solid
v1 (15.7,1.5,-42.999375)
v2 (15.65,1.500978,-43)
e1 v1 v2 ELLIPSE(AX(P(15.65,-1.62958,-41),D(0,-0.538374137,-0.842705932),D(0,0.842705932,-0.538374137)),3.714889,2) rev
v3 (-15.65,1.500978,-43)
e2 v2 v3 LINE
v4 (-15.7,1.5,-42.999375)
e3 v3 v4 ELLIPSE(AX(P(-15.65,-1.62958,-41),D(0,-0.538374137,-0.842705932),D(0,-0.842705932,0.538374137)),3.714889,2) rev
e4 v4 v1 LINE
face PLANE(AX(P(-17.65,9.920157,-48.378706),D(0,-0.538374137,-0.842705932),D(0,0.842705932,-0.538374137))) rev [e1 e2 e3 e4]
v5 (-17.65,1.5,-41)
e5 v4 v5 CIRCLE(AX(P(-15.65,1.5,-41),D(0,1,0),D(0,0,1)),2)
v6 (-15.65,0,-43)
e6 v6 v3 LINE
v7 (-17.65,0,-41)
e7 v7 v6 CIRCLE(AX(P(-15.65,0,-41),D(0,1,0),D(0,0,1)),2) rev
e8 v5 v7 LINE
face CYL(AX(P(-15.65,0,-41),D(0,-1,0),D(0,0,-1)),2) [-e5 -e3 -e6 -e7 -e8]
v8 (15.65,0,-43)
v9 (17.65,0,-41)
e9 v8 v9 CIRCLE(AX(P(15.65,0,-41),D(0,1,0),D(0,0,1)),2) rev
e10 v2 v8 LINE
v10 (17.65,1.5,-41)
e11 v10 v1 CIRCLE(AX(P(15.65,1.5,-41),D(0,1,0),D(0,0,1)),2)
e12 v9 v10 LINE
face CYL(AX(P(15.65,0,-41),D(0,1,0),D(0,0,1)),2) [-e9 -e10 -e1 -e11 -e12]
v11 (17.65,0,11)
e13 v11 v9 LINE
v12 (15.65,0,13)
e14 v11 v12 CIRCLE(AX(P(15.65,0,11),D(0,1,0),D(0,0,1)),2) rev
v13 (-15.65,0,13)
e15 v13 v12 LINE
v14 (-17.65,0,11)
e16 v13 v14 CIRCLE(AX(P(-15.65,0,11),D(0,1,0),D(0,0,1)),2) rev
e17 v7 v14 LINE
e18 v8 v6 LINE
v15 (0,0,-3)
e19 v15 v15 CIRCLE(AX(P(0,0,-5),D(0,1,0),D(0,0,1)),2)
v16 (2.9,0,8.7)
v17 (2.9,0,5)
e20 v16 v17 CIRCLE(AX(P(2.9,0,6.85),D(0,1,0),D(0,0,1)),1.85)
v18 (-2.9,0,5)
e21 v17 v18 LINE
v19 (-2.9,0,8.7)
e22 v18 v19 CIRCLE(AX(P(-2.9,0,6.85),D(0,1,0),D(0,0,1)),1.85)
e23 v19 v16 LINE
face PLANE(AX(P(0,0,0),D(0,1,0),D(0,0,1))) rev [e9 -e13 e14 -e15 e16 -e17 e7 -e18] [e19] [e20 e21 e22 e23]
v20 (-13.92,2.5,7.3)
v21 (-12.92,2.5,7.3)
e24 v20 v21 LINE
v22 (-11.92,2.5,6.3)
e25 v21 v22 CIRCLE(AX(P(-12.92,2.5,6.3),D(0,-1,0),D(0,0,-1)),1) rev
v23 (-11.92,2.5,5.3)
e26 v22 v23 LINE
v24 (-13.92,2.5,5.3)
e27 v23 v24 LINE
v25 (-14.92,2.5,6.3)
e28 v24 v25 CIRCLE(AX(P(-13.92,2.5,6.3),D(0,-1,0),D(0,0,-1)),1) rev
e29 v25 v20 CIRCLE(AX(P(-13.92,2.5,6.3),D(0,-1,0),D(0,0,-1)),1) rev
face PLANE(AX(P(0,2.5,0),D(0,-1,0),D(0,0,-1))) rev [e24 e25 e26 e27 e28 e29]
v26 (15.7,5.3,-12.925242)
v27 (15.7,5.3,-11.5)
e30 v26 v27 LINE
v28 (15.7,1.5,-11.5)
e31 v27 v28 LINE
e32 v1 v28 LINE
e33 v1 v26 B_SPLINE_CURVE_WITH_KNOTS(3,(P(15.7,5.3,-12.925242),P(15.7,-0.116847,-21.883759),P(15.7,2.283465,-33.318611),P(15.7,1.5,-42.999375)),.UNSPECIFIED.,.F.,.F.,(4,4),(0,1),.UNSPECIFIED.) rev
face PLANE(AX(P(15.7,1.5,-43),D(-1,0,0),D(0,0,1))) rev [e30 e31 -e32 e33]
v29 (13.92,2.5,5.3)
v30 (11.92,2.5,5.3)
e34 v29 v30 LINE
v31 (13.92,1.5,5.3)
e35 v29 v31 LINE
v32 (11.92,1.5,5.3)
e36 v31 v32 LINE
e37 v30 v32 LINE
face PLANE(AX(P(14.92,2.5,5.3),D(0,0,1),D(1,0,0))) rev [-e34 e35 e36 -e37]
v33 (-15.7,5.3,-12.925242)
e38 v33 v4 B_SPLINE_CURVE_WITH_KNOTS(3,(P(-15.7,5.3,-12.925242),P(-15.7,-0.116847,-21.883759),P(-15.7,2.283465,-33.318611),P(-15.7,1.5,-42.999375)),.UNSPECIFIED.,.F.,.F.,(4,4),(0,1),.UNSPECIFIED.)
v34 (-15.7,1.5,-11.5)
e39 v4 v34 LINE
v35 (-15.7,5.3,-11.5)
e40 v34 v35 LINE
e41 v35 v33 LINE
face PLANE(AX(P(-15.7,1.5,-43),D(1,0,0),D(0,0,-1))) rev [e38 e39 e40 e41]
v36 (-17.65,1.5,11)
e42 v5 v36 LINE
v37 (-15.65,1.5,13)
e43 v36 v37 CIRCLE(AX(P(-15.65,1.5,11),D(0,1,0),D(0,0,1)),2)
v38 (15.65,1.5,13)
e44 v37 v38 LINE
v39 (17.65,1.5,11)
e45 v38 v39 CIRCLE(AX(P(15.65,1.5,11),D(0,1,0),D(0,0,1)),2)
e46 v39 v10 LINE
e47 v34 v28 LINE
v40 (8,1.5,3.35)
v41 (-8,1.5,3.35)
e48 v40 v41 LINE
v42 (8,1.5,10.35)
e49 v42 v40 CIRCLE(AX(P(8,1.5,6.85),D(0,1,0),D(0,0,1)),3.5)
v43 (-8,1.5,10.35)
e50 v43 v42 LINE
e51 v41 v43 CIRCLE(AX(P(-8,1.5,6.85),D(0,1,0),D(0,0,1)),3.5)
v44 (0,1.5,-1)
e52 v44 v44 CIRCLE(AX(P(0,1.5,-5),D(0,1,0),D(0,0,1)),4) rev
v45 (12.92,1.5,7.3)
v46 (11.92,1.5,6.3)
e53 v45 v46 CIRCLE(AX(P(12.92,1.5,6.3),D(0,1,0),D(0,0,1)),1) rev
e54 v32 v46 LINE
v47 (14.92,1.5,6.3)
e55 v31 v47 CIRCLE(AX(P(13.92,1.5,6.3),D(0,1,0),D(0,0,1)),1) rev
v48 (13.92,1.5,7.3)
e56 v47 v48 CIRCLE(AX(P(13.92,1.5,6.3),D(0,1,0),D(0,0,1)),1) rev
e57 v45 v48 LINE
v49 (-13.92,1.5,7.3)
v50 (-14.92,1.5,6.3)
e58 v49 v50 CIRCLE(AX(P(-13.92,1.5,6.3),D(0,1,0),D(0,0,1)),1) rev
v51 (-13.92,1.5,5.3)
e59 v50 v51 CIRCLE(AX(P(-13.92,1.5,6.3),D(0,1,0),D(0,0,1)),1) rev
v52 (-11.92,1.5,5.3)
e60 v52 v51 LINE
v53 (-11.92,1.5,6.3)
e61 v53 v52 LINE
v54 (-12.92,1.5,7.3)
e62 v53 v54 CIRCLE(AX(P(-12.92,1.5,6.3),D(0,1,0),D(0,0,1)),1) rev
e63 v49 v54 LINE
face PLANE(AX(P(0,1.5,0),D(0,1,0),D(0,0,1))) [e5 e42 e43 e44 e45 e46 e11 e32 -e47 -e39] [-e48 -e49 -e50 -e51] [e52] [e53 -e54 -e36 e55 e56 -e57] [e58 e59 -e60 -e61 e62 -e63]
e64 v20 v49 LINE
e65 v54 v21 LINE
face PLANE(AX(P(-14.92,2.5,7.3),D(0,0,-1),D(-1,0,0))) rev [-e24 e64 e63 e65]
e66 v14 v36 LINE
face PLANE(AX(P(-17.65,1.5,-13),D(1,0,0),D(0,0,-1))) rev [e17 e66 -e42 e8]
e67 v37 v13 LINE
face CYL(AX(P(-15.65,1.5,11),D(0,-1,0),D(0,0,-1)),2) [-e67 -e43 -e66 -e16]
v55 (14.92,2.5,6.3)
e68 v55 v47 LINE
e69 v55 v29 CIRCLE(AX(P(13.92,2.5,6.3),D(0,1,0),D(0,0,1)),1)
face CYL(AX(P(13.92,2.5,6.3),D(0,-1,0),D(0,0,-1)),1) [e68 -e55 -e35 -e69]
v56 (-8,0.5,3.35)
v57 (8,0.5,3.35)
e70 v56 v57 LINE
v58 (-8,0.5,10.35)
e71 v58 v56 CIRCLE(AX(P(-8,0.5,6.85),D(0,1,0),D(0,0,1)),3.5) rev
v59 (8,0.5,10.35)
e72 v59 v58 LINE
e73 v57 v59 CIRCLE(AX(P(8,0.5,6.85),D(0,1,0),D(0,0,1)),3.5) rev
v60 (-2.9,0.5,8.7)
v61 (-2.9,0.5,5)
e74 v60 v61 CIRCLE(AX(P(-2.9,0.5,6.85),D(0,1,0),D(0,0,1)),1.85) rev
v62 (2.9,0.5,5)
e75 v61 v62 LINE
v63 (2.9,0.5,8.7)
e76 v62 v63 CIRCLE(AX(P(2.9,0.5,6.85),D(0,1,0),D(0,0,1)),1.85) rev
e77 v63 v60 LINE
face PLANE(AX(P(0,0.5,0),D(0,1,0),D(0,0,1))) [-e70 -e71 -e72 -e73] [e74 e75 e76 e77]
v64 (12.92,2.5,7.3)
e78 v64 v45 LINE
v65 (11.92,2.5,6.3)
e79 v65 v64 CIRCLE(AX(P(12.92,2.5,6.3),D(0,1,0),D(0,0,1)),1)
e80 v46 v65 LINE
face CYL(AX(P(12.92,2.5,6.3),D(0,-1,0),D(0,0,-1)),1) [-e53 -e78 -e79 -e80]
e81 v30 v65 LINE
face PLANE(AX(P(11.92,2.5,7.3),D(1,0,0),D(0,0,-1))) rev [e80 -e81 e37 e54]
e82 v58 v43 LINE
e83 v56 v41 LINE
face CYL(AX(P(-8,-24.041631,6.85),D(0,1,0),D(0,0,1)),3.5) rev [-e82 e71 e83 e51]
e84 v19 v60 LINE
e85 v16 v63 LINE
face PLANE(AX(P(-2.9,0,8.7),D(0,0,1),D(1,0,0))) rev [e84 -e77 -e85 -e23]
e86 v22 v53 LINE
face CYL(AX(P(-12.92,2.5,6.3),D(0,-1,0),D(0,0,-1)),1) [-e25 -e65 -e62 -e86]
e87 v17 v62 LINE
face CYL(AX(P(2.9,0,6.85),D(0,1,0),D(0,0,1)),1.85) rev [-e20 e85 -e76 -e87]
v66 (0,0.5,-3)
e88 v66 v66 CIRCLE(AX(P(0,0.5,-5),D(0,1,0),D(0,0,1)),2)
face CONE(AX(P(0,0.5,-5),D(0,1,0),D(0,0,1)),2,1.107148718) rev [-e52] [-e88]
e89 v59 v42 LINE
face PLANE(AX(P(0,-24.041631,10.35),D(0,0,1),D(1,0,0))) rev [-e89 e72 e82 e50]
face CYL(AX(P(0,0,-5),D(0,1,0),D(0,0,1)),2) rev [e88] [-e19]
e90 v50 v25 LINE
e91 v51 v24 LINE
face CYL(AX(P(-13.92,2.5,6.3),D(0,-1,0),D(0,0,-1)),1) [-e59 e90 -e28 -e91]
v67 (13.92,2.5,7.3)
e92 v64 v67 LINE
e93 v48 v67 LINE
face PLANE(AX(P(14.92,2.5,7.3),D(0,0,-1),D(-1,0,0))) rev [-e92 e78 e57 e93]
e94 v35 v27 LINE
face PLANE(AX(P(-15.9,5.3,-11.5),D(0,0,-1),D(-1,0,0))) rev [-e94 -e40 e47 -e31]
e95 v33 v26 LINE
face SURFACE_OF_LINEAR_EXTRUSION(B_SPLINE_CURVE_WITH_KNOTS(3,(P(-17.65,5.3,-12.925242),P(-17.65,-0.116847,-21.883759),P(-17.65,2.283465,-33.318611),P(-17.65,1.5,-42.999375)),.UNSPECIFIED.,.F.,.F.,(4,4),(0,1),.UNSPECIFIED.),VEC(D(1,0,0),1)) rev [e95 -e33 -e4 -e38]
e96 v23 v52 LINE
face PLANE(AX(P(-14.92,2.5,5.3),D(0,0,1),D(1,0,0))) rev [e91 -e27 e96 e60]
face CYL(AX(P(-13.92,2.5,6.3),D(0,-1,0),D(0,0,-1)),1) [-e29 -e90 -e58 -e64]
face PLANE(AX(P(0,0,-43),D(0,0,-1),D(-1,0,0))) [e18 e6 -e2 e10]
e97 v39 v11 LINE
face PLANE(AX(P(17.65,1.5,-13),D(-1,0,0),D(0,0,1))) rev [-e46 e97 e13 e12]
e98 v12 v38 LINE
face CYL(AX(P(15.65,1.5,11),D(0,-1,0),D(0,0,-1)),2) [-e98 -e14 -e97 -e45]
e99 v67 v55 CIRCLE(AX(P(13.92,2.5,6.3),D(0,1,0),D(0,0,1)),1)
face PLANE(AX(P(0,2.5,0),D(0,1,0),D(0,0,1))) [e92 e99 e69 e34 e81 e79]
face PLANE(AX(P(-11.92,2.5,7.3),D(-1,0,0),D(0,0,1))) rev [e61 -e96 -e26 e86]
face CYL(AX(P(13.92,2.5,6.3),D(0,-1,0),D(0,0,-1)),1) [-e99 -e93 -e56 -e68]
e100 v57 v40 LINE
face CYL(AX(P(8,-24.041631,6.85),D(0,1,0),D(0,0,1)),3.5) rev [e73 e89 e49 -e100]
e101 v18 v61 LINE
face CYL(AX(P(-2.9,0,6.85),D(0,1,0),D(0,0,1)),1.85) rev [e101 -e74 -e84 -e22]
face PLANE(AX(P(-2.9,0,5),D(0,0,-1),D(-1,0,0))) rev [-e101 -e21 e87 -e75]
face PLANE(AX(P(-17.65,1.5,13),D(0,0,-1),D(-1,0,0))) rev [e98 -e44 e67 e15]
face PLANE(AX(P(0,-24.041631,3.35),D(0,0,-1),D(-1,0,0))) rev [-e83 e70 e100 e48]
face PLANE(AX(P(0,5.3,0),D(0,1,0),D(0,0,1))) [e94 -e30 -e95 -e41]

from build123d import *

# Parameters (mm, degrees)
SKETCH1_W               = 35.3
SKETCH1_H               = 26
BOSS_EXTRUDE1_DEPTH     = 1.5
SKETCH2_W               = 31.8
SKETCH2_H               = 1.5
BOSS_EXTRUDE2_DEPTH     = 3.8
CUT_EXTRUDE1_DEPTH      = 23.247752695
CUT_EXTRUDE1_DEPTH_BACK = 23.247752695
SKETCH3_R               = 2
CHAMFER1_SIZE           = 2
CHAMFER1_SIZE2          = 1
FILLET1_R               = 2
BOSS_EXTRUDE3_DEPTH     = 30
FILLET2_R               = 2
SKETCH6_W               = 3
SKETCH6_H               = 2
BOSS_EXTRUDE4_DEPTH     = 1
FILLET4_R               = 1
SKETCH7_W               = 1.743977538
SKETCH7_H               = 6.350659455
SKETCH7_W_2             = 2.282976844
SKETCH7_H_2             = 7.649157782
CUT_EXTRUDE2_DEPTH      = 37.494691395
CUT_EXTRUDE5_DEPTH      = 55.674605623
CUT_EXTRUDE5_DEPTH_BACK = 55.674605623
CUT_EXTRUDE6_DEPTH      = 47.63649323
CUT_EXTRUDE6_DEPTH_BACK = 47.63649323
CUT_EXTRUDE7_START      = -1.5
CUT_EXTRUDE7_DEPTH      = 1


with BuildPart() as part:
    # Sketch1 → Boss-Extrude1 (new body)
    with BuildSketch(Plane(origin=(0, 0, 0), x_dir=(1, 0, 0), z_dir=(0, 1, 0))):
        Rectangle(SKETCH1_W, SKETCH1_H)
    extrude(amount=BOSS_EXTRUDE1_DEPTH)

    # Sketch2 → Boss-Extrude2 (add)
    with BuildSketch(Plane(origin=(0, 1.5, 0), x_dir=(1, 0, 0), z_dir=(0, 1, 0))):
        with Locations((0, 12.25)):
            Rectangle(SKETCH2_W, SKETCH2_H)
    extrude(amount=BOSS_EXTRUDE2_DEPTH)

    # Sketch3 → Cut-Extrude1 (cut, two sides: drawn at the far end of the back side and taken through both)
    with BuildSketch(Plane(origin=(0, 1.5, 0), x_dir=(1, 0, 0), z_dir=(0, 1, 0)).offset(-CUT_EXTRUDE1_DEPTH_BACK)):
        with Locations(Location((0, 5, 0), (0, 0, 270))):
            Circle(SKETCH3_R)
    extrude(amount=CUT_EXTRUDE1_DEPTH + CUT_EXTRUDE1_DEPTH_BACK, mode=Mode.SUBTRACT)

    # Chamfer1
    chamfer1_edges = [part.edges().sort_by_distance(p)[0] for p in [
        (0, 1.5, -7),
    ]]
    chamfer1_side = [part.faces().sort_by_distance(p)[0] for p in [
        (0, 1.5, 0.754672273),
    ]]
    chamfer(chamfer1_edges, length=CHAMFER1_SIZE, length2=CHAMFER1_SIZE2, reference=chamfer1_side[0])

    # Fillet1
    fillet1_edges = [part.edges().sort_by_distance(p)[0] for p in [
        (17.65, 0.75, 13),
        (-17.65, 0.75, 13),
    ]]
    fillet(fillet1_edges, radius=FILLET1_R)

    # Sketch4 → Boss-Extrude3 (add)
    with BuildSketch(Plane(origin=(0, 0, -13), x_dir=(-1, 0, 0), z_dir=(0, 0, -1))):
        Polygon((-15.9, 5.3), (-15.9, 1.5), (-17.65, 1.5), (-17.65, 0), (17.65, 0), (17.65, 1.5), (15.9, 1.5), (15.9, 5.3), align=None)
    extrude(amount=BOSS_EXTRUDE3_DEPTH)

    # Fillet2
    fillet2_edges = [part.edges().sort_by_distance(p)[0] for p in [
        (-17.65, 0.75, -43),
        (17.65, 0.75, -43),
    ]]
    fillet(fillet2_edges, radius=FILLET2_R)

    # Sketch6 → Boss-Extrude4 (add)
    with BuildSketch(Plane(origin=(0, 1.5, 0), x_dir=(1, 0, 0), z_dir=(0, 1, 0))):
        with Locations((-13.42, -6.3)):
            Rectangle(SKETCH6_W, SKETCH6_H)
        with Locations((13.42, -6.3)):
            Rectangle(SKETCH6_W, SKETCH6_H)
    extrude(amount=BOSS_EXTRUDE4_DEPTH)

    # Fillet4
    fillet4_edges = [part.edges().sort_by_distance(p)[0] for p in [
        (-14.92, 2, 5.3),
        (14.92, 2, 5.3),
        (14.92, 2, 7.3),
        (11.92, 2, 7.3),
        (-11.92, 2, 7.3),
        (-14.92, 2, 7.3),
    ]]
    fillet(fillet4_edges, radius=FILLET4_R - 0.0001)  # a hair under: the kernel refuses the full size

    # Sketch7 → Cut-Extrude2 (cut, through all)
    with BuildSketch(Plane.XY.offset(-11.5)):
        with Locations((-16.571988769, 4.675329728)):
            Rectangle(SKETCH7_W, SKETCH7_H)
        with Locations((16.841488422, 5.324578891)):
            Rectangle(SKETCH7_W_2, SKETCH7_H_2)
    extrude(amount=-CUT_EXTRUDE2_DEPTH, mode=Mode.SUBTRACT)

    # Sketch10 → Cut-Extrude5 (cut, two sides: drawn at the far end of the back side and taken through both)
    with BuildSketch(Plane(origin=(15.7, 0, 0), x_dir=(0, 0, -1), z_dir=(1, 0, 0)).offset(-CUT_EXTRUDE5_DEPTH_BACK)):
        with BuildLine():
            Line((12.925241615, 5.3), (13.354629123, 9.309511059))
            Line((13.354629123, 9.309511059), (48.378706372, 9.920156593))
            Line((48.378706372, 9.920156593), (42.999374902, 1.5))
            add(Edge.make_bspline(
                [(12.925241615, 5.3), (21.883759375, -0.11684658), (33.318611191, 2.283464976), (42.999374902, 1.5)],
                knots=[0, 0, 0, 0, 1, 1, 1, 1], degree=3))
        make_face()
    extrude(amount=CUT_EXTRUDE5_DEPTH + CUT_EXTRUDE5_DEPTH_BACK, mode=Mode.SUBTRACT)

    # Sketch12 → Cut-Extrude6 (cut, two sides: drawn at the far end of the back side and taken through both)
    with BuildSketch(Plane(origin=(0, 1.5, 0), x_dir=(1, 0, 0), z_dir=(0, 1, 0)).offset(-CUT_EXTRUDE6_DEPTH_BACK)):
        with BuildLine():
            Line((-2.9, -5), (2.9, -5))
            ThreePointArc((2.9, -5), (4.75, -6.85), (2.9, -8.7))
            Line((2.9, -8.7), (-2.9, -8.7))
            ThreePointArc((-2.9, -8.7), (-4.75, -6.85), (-2.9, -5))
        make_face()
    extrude(amount=CUT_EXTRUDE6_DEPTH + CUT_EXTRUDE6_DEPTH_BACK, mode=Mode.SUBTRACT)

    # Sketch13 → Cut-Extrude7 (cut)
    with BuildSketch(Plane.XZ.offset(CUT_EXTRUDE7_START)):
        with BuildLine():
            Line((-8, 10.35), (8, 10.35))
            ThreePointArc((8, 10.35), (11.5, 6.85), (8, 3.35))
            Line((8, 3.35), (-8, 3.35))
            ThreePointArc((-8, 3.35), (-11.5, 6.85), (-8, 10.35))
        make_face()
    extrude(amount=CUT_EXTRUDE7_DEPTH, mode=Mode.SUBTRACT)


solid = part.part
